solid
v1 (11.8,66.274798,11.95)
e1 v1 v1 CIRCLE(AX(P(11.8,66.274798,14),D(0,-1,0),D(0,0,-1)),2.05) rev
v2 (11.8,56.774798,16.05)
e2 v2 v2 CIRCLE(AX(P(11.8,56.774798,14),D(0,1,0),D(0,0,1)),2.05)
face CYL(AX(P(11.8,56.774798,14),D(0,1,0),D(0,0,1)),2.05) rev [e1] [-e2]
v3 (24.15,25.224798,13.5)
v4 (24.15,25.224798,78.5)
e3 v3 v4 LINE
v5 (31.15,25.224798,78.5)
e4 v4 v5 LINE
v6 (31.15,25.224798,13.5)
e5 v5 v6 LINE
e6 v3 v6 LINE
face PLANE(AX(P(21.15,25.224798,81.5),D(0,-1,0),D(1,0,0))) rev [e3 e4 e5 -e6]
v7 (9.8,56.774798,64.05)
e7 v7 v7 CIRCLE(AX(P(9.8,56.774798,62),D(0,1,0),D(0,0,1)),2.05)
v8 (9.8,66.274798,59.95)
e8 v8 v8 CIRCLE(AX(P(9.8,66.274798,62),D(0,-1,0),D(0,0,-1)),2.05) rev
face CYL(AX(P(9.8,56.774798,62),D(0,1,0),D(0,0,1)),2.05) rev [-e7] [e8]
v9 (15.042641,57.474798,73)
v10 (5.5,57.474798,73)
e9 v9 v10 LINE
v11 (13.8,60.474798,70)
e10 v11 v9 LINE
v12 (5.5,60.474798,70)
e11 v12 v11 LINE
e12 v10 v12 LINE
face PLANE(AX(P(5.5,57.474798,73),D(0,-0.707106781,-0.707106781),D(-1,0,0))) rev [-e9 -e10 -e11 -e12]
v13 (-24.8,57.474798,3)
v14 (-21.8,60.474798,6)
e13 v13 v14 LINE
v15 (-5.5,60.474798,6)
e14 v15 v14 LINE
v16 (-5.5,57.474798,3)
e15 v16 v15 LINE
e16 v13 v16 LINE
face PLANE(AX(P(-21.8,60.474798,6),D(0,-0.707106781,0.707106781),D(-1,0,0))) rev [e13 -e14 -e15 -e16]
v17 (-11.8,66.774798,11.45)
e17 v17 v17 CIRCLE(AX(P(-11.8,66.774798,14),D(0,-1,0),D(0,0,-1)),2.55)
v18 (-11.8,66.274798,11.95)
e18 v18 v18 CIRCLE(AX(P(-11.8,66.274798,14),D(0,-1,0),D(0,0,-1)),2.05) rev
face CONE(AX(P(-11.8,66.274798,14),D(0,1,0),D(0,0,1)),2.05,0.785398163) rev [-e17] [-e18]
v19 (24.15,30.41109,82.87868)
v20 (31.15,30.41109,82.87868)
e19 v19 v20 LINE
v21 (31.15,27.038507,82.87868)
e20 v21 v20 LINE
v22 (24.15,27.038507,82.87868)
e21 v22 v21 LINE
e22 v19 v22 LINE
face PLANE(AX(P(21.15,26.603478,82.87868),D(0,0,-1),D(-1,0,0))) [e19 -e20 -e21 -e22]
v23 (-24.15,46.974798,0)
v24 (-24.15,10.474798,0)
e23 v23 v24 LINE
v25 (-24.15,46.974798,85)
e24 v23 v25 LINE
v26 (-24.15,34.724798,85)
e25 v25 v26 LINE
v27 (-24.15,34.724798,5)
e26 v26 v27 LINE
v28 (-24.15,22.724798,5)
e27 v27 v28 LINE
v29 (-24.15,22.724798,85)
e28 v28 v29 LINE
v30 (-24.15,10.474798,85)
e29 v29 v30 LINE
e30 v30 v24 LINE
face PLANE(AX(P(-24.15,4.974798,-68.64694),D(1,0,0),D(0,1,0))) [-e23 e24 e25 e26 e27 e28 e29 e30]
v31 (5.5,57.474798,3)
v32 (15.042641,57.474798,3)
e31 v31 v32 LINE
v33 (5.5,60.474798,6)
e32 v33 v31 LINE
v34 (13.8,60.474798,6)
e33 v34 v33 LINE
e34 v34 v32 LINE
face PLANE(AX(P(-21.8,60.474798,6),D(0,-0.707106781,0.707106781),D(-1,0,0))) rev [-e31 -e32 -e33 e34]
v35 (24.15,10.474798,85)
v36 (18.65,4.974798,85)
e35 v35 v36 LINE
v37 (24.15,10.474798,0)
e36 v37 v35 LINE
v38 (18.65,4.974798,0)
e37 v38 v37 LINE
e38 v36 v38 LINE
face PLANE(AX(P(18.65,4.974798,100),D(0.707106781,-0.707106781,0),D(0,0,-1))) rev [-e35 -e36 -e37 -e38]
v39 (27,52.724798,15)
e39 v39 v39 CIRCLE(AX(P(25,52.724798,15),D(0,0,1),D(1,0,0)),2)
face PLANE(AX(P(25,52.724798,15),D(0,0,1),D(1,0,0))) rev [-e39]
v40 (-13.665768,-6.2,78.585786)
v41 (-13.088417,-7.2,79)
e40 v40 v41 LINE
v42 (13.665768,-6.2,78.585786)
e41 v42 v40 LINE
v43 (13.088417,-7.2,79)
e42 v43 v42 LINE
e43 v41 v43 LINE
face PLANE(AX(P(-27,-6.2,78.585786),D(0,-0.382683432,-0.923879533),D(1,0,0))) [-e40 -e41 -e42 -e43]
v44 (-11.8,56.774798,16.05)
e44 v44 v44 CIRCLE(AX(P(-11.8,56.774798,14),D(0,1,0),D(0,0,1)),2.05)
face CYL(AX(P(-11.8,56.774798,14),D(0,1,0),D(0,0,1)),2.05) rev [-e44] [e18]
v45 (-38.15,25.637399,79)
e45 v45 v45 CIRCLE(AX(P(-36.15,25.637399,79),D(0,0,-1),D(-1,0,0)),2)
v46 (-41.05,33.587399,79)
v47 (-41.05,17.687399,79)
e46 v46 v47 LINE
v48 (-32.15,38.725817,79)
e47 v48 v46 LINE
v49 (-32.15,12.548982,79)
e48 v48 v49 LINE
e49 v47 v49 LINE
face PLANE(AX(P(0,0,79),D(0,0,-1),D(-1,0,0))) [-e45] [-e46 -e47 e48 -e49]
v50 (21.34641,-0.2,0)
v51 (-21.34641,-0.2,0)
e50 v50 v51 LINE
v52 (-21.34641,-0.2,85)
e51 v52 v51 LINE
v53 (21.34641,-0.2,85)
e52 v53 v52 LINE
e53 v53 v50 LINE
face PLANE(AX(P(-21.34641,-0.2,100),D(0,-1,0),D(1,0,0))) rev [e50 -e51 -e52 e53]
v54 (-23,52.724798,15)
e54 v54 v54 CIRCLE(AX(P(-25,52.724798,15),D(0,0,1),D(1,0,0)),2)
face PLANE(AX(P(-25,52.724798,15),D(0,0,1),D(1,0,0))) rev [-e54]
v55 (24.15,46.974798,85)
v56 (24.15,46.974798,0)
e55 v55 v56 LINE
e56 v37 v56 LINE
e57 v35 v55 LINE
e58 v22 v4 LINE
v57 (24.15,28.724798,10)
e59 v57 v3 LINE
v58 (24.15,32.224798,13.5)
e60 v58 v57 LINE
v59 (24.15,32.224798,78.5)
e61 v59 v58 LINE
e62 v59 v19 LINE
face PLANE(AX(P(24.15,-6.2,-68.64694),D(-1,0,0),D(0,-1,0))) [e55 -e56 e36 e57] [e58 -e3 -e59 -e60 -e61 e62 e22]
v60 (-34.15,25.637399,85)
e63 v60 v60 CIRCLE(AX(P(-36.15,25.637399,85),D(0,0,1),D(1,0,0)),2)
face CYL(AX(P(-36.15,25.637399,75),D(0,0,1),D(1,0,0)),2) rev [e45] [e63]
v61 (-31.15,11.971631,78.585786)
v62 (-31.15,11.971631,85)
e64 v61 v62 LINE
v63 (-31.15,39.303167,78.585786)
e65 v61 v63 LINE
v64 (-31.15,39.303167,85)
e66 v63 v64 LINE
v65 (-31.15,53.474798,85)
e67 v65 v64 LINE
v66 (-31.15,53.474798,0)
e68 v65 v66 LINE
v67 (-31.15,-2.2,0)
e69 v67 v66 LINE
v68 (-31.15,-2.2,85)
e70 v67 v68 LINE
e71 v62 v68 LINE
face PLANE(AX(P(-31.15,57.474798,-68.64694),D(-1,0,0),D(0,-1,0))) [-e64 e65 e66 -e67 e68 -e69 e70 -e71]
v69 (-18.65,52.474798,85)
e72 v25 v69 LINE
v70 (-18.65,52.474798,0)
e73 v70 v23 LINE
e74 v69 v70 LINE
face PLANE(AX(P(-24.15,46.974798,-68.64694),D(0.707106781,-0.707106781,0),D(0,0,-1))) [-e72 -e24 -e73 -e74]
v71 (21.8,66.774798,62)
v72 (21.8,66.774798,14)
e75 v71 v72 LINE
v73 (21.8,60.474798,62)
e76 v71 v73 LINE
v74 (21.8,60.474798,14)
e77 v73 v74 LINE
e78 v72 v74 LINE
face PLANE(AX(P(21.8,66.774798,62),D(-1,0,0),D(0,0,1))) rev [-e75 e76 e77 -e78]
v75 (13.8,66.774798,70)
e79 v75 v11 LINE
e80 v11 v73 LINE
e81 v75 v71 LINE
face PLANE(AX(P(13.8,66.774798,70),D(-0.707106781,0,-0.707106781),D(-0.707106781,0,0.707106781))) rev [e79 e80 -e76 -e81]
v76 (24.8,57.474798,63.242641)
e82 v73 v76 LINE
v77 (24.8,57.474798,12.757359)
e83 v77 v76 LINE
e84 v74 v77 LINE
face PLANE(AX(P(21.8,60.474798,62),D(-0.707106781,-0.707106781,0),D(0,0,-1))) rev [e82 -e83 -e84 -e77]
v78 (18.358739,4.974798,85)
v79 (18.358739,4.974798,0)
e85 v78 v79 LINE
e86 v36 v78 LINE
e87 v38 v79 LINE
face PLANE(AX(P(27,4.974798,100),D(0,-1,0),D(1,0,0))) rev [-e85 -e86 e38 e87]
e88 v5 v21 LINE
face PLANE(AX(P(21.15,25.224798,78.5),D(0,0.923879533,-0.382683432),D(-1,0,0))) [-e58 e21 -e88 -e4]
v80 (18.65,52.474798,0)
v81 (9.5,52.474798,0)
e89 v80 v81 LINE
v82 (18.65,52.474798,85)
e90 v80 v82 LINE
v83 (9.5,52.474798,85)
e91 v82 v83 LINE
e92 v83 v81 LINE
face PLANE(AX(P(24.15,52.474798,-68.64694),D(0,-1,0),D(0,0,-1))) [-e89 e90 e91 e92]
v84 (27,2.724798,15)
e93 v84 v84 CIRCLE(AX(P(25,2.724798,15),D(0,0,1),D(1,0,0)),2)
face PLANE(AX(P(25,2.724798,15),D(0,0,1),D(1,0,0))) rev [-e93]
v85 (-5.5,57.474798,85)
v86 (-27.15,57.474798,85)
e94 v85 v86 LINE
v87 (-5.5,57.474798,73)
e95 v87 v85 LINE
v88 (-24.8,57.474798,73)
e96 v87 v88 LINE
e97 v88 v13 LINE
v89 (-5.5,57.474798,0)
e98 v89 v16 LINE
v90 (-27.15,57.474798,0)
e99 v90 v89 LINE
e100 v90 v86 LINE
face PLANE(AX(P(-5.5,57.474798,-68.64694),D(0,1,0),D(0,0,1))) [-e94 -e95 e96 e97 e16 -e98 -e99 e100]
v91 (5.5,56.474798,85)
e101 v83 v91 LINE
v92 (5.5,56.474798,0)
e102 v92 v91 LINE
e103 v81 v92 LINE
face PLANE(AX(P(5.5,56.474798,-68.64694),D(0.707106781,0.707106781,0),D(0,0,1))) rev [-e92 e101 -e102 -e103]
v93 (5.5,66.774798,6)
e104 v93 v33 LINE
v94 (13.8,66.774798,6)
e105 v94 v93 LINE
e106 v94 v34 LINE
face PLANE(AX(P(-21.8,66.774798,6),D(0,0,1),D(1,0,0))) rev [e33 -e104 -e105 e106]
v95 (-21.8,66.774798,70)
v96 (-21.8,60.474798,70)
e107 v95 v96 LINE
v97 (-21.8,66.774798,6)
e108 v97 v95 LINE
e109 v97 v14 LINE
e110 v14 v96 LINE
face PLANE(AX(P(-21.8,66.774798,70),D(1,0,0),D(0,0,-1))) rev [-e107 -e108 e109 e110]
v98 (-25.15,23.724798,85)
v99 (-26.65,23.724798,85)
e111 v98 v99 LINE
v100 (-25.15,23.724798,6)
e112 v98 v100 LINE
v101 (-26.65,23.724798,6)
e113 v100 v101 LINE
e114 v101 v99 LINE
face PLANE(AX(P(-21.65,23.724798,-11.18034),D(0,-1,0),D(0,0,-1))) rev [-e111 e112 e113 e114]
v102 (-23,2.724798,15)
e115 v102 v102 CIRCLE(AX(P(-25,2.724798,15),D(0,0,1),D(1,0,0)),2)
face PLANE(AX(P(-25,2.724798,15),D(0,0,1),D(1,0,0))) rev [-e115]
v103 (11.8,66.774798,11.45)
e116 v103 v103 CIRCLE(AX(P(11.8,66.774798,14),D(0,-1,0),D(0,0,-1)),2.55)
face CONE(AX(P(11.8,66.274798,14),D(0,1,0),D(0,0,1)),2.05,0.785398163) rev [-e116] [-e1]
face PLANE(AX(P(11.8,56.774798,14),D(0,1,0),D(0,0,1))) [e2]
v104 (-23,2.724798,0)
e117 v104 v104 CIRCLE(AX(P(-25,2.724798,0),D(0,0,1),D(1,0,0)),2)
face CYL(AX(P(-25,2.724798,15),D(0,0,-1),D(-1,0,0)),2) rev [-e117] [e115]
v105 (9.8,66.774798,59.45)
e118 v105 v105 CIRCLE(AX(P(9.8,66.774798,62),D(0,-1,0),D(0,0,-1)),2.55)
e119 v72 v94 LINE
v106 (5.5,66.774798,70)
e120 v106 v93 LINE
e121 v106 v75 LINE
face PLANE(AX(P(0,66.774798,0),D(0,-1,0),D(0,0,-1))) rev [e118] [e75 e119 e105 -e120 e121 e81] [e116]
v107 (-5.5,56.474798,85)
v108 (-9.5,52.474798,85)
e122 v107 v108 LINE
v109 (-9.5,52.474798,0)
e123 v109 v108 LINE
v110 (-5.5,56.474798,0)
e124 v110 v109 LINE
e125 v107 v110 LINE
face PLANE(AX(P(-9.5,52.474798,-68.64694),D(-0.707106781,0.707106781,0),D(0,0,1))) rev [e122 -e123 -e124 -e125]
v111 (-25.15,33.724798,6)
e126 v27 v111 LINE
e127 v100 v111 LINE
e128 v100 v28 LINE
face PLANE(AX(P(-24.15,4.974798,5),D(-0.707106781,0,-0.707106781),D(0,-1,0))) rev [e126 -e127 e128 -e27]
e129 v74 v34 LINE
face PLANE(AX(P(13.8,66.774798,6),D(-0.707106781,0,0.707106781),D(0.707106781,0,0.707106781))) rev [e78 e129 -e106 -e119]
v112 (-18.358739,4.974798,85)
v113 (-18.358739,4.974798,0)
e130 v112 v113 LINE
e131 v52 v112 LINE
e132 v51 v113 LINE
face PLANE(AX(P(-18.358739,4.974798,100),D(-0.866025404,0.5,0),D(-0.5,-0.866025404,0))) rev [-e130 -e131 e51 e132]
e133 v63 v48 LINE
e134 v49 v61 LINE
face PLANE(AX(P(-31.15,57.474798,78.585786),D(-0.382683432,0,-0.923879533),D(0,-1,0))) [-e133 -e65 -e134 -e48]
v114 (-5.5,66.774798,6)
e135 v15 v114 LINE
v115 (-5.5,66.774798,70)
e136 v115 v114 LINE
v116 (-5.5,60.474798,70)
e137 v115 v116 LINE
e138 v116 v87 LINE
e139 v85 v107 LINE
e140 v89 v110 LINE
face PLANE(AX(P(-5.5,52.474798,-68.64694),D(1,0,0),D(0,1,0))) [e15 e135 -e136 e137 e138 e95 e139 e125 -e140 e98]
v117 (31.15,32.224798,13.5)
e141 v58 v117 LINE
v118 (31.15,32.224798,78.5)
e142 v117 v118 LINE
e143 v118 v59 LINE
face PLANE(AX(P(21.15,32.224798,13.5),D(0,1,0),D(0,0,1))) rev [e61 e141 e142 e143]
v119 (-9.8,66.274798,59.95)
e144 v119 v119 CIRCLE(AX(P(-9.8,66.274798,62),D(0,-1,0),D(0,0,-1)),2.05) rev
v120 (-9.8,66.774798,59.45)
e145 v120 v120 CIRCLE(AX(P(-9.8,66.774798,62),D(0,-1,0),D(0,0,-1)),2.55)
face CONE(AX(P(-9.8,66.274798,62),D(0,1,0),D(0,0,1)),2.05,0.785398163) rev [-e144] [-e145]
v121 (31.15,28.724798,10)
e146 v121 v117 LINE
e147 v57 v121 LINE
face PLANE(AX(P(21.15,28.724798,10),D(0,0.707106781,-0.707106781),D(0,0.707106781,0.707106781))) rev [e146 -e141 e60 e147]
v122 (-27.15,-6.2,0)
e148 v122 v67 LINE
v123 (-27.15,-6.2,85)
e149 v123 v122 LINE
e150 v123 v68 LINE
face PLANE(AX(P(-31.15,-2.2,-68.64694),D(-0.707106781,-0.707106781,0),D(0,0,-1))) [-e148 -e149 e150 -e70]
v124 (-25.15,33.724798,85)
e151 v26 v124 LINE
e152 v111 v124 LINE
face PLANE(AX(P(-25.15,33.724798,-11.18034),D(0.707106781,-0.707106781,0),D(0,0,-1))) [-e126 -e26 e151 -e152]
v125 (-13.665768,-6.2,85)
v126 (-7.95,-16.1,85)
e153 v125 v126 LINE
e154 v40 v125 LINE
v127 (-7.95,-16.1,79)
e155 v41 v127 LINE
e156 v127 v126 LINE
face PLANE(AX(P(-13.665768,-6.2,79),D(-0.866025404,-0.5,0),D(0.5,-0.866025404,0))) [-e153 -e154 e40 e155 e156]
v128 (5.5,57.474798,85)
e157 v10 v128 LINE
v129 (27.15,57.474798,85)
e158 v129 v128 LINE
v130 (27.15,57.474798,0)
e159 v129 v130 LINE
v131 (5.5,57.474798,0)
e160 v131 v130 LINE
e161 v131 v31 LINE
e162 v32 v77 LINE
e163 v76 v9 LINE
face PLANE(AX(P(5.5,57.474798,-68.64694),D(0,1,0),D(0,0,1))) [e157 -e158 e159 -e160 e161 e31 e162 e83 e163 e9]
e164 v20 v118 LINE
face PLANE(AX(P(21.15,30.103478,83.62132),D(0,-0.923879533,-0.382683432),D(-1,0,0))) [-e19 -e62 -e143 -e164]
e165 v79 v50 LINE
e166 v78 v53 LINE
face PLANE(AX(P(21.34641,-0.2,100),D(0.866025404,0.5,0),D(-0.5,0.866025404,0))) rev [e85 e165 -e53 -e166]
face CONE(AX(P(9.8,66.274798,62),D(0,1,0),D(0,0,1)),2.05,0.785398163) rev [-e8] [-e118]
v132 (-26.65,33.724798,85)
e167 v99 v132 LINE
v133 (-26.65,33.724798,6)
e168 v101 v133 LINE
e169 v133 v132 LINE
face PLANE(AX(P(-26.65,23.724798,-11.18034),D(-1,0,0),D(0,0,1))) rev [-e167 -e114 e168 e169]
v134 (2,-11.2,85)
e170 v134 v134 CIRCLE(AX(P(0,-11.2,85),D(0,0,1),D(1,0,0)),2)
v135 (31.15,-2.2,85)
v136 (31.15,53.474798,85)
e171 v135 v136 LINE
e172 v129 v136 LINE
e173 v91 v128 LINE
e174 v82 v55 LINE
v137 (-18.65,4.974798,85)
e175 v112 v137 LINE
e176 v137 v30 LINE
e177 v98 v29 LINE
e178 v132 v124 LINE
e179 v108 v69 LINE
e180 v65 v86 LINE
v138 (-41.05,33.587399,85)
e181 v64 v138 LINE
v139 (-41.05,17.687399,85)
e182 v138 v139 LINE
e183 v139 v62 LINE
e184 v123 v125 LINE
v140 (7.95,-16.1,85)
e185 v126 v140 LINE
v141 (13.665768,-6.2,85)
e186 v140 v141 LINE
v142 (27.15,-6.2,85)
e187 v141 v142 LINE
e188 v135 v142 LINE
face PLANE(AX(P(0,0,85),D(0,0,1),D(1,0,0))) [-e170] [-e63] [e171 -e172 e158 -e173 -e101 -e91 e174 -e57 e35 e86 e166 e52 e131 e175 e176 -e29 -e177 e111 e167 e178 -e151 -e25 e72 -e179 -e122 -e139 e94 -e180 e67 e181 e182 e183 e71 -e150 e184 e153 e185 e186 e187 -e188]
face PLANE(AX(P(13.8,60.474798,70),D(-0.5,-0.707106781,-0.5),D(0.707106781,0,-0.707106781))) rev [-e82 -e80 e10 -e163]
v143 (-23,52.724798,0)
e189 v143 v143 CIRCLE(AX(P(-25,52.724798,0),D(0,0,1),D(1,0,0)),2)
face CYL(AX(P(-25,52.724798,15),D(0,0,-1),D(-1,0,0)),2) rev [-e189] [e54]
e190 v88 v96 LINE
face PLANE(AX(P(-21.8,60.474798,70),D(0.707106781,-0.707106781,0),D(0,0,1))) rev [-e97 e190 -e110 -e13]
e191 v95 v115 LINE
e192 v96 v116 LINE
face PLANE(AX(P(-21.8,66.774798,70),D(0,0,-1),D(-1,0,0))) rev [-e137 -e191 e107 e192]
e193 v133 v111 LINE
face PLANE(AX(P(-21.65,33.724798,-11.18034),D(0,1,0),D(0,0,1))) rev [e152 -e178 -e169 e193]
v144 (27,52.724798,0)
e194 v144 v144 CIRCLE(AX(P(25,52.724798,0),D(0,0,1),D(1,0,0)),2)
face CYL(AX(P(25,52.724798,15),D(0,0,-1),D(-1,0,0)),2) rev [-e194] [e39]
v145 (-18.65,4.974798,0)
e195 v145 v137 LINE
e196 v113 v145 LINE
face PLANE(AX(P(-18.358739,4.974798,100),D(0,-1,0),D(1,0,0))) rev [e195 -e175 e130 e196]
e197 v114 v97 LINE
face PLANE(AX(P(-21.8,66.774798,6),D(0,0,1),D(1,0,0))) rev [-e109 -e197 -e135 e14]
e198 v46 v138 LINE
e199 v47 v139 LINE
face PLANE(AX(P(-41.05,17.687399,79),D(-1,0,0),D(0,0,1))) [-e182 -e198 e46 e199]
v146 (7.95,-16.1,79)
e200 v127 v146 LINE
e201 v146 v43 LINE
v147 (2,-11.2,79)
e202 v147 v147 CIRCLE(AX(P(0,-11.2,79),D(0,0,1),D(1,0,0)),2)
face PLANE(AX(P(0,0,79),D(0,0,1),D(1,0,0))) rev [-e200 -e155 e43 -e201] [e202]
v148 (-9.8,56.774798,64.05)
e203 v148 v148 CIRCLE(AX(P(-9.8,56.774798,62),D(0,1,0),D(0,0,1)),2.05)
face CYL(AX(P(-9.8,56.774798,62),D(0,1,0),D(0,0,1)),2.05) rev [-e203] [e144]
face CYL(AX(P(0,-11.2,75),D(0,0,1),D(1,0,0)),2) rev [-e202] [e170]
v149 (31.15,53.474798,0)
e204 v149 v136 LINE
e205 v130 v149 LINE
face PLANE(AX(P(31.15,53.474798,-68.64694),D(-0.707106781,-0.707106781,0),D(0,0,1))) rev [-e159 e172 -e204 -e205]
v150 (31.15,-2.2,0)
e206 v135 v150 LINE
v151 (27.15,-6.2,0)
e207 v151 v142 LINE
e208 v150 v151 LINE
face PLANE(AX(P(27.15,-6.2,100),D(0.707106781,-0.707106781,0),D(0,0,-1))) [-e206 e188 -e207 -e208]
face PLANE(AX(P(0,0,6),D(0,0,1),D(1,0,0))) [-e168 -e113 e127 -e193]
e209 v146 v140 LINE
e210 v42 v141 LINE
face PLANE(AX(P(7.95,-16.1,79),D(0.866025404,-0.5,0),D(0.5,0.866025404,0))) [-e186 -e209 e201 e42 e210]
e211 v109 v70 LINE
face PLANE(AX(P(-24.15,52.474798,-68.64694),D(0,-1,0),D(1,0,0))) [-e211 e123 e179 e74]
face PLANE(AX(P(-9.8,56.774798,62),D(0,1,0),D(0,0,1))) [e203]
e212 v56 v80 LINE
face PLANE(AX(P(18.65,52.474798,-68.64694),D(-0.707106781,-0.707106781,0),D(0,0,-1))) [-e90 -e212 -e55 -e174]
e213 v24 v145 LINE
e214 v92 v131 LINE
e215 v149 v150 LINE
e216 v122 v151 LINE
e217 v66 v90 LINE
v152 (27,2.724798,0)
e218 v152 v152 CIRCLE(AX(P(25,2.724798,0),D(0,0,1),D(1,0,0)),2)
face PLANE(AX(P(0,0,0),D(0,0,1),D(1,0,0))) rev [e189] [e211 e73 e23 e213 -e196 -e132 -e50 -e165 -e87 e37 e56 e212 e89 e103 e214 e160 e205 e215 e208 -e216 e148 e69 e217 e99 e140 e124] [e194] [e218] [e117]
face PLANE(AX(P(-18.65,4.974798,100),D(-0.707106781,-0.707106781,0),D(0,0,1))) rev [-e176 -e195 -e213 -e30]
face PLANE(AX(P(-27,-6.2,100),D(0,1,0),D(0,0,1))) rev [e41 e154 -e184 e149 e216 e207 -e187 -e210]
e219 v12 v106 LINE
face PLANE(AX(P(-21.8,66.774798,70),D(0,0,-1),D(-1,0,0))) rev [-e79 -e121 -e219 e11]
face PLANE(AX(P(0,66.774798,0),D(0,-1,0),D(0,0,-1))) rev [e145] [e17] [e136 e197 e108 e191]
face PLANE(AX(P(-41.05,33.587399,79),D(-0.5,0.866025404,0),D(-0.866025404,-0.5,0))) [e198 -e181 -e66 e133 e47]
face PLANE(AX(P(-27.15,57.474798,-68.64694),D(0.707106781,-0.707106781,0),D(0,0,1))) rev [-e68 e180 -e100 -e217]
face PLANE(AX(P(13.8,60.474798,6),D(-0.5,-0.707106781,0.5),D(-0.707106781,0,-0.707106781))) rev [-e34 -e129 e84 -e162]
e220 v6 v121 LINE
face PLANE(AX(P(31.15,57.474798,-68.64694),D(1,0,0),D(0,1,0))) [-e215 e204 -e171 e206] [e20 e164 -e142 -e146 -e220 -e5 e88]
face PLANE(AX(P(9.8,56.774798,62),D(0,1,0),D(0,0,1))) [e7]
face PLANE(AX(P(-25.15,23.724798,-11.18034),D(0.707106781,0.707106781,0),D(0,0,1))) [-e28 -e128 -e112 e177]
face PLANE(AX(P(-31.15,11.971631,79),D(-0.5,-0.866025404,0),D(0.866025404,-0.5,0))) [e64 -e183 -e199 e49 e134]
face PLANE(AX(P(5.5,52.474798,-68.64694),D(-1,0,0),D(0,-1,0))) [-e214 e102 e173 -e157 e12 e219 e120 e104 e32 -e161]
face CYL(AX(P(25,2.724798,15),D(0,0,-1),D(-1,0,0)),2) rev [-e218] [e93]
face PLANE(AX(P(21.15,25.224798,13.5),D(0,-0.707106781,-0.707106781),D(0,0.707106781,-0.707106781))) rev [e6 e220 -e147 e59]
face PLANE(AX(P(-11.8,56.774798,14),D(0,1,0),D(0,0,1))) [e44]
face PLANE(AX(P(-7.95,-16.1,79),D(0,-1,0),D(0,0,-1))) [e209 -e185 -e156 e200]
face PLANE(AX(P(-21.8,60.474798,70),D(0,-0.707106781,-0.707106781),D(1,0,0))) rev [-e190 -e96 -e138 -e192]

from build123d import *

# Parameters (mm, degrees)
BOSS_EXTRUDE1_DEPTH     = 100
BOSS_EXTRUDE2_DEPTH     = 100
CUT_EXTRUDE1_DEPTH      = 10
CHAMFER1_SIZE           = 5.5
CHAMFER2_SIZE           = 4
SKETCH8_R               = 2
BOSS_EXTRUDE3_DEPTH     = 9.3
CUT_EXTRUDE3_DEPTH      = 125.214315536
CUT_EXTRUDE3_DEPTH_BACK = 10
SKETCH9_W               = 11
SKETCH9_H               = 9.3
CHAMFER3_SIZE           = 4
CHAMFER4_SIZE           = 3
CHAMFER5_SIZE           = 3
SKETCH10_W              = 5
SKETCH10_H              = 10
CUT_EXTRUDE4_DEPTH      = 94
CHAMFER7_SIZE           = 1
CHAMFER8_SIZE           = 1
SKETCH11_R              = 2.05
CUT_EXTRUDE5_DEPTH      = 10
CHAMFER9_SIZE           = 0.5
SKETCH12_R              = 2
CUT_EXTRUDE6_DEPTH      = 15
SKETCH20_W              = 62.3
SKETCH20_H              = 63.674798271
CUT_EXTRUDE14_DEPTH     = 15
BOSS_EXTRUDE4_DEPTH     = 6
SKETCH22_R              = 2
CUT_EXTRUDE15_DEPTH     = 10
CHAMFER10_SIZE          = 1
CHAMFER10_SIZE2         = 0.414213562
CHAMFER11_SIZE          = 1
CHAMFER11_SIZE2         = 0.414213562


with BuildPart() as part:
    # Sketch4 → Boss-Extrude1 (new body)
    with BuildSketch(Plane.XY):
        Polygon((-18.358738987, 4.974798271), (-27, 4.974798271), (-27, -6.2), (27, -6.2), (27, 4.974798271), (18.358738987, 4.974798271), (21.346410162, -0.2), (-21.346410162, -0.2), align=None)
    extrude(amount=BOSS_EXTRUDE1_DEPTH)

    # Sketch6 → Boss-Extrude2 (add)
    with BuildSketch(Plane.XY.offset(100)):
        Polygon((-24.15, 4.974798271), (-24.15, 52.474798271), (-5.5, 52.474798271), (-5.5, 57.474798271), (-31.15, 57.474798271), (-31.15, -6.2), (-24.15, -6.2), align=None)
        Polygon((24.15, -6.2), (24.15, 52.474798271), (5.5, 52.474798271), (5.5, 57.474798271), (31.15, 57.474798271), (31.15, -6.2), align=None)
    extrude(amount=-BOSS_EXTRUDE2_DEPTH)

    # Sketch7 → Cut-Extrude1 (cut)
    with BuildSketch(Plane(origin=(31.15, 0, 0), x_dir=(0, 0, -1), z_dir=(1, 0, 0))):
        Polygon((-85, 28.724798271), (-81.5, 25.224798271), (-13.5, 25.224798271), (-10, 28.724798271), (-13.5, 32.224798271), (-81.5, 32.224798271), align=None)
    extrude(amount=-CUT_EXTRUDE1_DEPTH, mode=Mode.SUBTRACT)

    # Chamfer1
    chamfer1_edges = [part.edges().sort_by_distance(p)[0] for p in [
        (-24.15, 52.474798271, 50),
        (-24.15, 4.974798271, 50),
        (24.15, 4.974798271, 50),
        (24.15, 52.474798271, 50),
    ]]
    chamfer(chamfer1_edges, length=CHAMFER1_SIZE)

    # Chamfer2
    chamfer2_edges = [part.edges().sort_by_distance(p)[0] for p in [
        (-5.5, 52.474798271, 50),
        (5.5, 52.474798271, 50),
    ]]
    chamfer(chamfer2_edges, length=CHAMFER2_SIZE)

    # Sketch8 → Boss-Extrude3 (add)
    with BuildSketch(Plane(origin=(0, 57.474798271, 0), x_dir=(1, 0, 0), z_dir=(0, 1, 0))):
        Polygon((-21.8, -70), (13.8, -70), (21.8, -62), (21.8, -14), (13.8, -6), (-21.8, -6), align=None)
        with Locations(Location((9.8, -62, 0), (0, 0, 270))):
            Circle(SKETCH8_R, mode=Mode.SUBTRACT)
        with Locations(Location((11.8, -14, 0), (0, 0, 270))):
            Circle(SKETCH8_R, mode=Mode.SUBTRACT)
        with Locations(Location((-11.8, -14, 0), (0, 0, 270))):
            Circle(SKETCH8_R, mode=Mode.SUBTRACT)
        with Locations(Location((-9.8, -62, 0), (0, 0, 270))):
            Circle(SKETCH8_R, mode=Mode.SUBTRACT)
    extrude(amount=BOSS_EXTRUDE3_DEPTH)

    # Sketch9 → Cut-Extrude3 (cut, two sides: drawn at the far end of the back side and taken through both)
    with BuildSketch(Plane.XY.offset(-CUT_EXTRUDE3_DEPTH_BACK)):
        with Locations((0, 62.124798271)):
            Rectangle(SKETCH9_W, SKETCH9_H)
    extrude(amount=CUT_EXTRUDE3_DEPTH + CUT_EXTRUDE3_DEPTH_BACK, mode=Mode.SUBTRACT)

    # Chamfer3
    chamfer3_edges = [part.edges().sort_by_distance(p)[0] for p in [
        (-31.15, -6.2, 50),
        (-31.15, 57.474798271, 50),
        (31.15, -6.2, 50),
        (31.15, 57.474798271, 50),
    ]]
    chamfer(chamfer3_edges, length=CHAMFER3_SIZE)

    # Chamfer4
    chamfer4_edges = [part.edges().sort_by_distance(p)[0] for p in [
        (9.65, 57.474798271, 70),
        (-21.8, 57.474798271, 38),
        (-13.65, 57.474798271, 70),
        (17.8, 57.474798271, 66),
        (21.8, 57.474798271, 38),
        (17.8, 57.474798271, 10),
        (9.65, 57.474798271, 6),
        (-13.65, 57.474798271, 6),
    ]]
    chamfer(chamfer4_edges, length=CHAMFER4_SIZE)

    # Chamfer5
    # the kernel refuses this chamfer: 3 mm, written as the material it adds along each edge
    with BuildSketch(Plane(origin=(31.15, 25.224798271, 81.5), x_dir=(0, -0.014760203742521738, -0.9998910622590239), z_dir=(-1, 0, 0)), Plane(origin=(31.15, 32.224798271, 81.5), x_dir=(0, -0.6965927104131427, 0.7174667907292097), z_dir=(-1, 0, 0))) as chamfer5_piece_1:
        Polygon((CHAMFER5_SIZE * 0.999891062259, -CHAMFER5_SIZE * 0.0147602037425), (-CHAMFER5_SIZE * 0.717466790729, -CHAMFER5_SIZE * 0.696592710413), (0, 0), align=None)
    extrude(amount=7)
    with BuildSketch(Plane(origin=(31.15, 28.724798271, 85), x_dir=(0, 0.7262819568766863, -0.687396915264661), z_dir=(-1, 0, 0))) as chamfer5_piece_2:
        Polygon((CHAMFER5_SIZE * 0.999621916911, CHAMFER5_SIZE * 0.0274958766106), (-CHAMFER5_SIZE * 0.0274958766106, CHAMFER5_SIZE * 0.999621916911), (0, 0), align=None)
    extrude(amount=7)

    # Sketch10 → Cut-Extrude4 (cut)
    with BuildSketch(Plane.XY.offset(100)):
        with Locations((-24.15, 28.724798271)):
            Rectangle(SKETCH10_W, SKETCH10_H)
    extrude(amount=-CUT_EXTRUDE4_DEPTH, mode=Mode.SUBTRACT)

    # Chamfer7
    chamfer7_edges = [part.edges().sort_by_distance(p)[0] for p in [
        (-24.15, 28.724798271, 6),
    ]]
    chamfer(chamfer7_edges, length=CHAMFER7_SIZE)

    # Chamfer8
    chamfer8_edges = [part.edges().sort_by_distance(p)[0] for p in [
        (-24.15, 23.724798271, 52.5),
        (-24.15, 33.724798271, 52.5),
    ]]
    chamfer(chamfer8_edges, length=CHAMFER8_SIZE)

    # Sketch11 → Cut-Extrude5 (cut)
    with BuildSketch(Plane(origin=(0, 66.774798271, 0), x_dir=(1, 0, 0), z_dir=(0, 1, 0))):
        with Locations(Location((-11.8, -14, 0), (0, 0, 270))):
            Circle(SKETCH11_R)
        with Locations(Location((11.8, -14, 0), (0, 0, 270))):
            Circle(SKETCH11_R)
        with Locations(Location((-9.8, -62, 0), (0, 0, 270))):
            Circle(SKETCH11_R)
        with Locations(Location((9.8, -62, 0), (0, 0, 270))):
            Circle(SKETCH11_R)
    extrude(amount=-CUT_EXTRUDE5_DEPTH, mode=Mode.SUBTRACT)

    # Chamfer9
    chamfer9_edges = [part.edges().sort_by_distance(p)[0] for p in [
        (11.8, 66.774798271, 11.95),
        (-9.8, 66.774798271, 59.95),
        (9.8, 66.774798271, 59.95),
        (-11.8, 66.774798271, 11.95),
    ]]
    chamfer(chamfer9_edges, length=CHAMFER9_SIZE)

    # Sketch12 → Cut-Extrude6 (cut)
    with BuildSketch(Plane.XY):
        with Locations((-25, 52.724798271)):
            Circle(SKETCH12_R)
        with Locations((25, 52.724798271)):
            Circle(SKETCH12_R)
        with Locations((-25, 2.724798271)):
            Circle(SKETCH12_R)
        with Locations((25, 2.724798271)):
            Circle(SKETCH12_R)
    extrude(amount=CUT_EXTRUDE6_DEPTH, mode=Mode.SUBTRACT)

    # Sketch20 → Cut-Extrude14 (cut)
    with BuildSketch(Plane.XY.offset(100)):
        with Locations((0, 25.637399136)):
            Rectangle(SKETCH20_W, SKETCH20_H)
    extrude(amount=-CUT_EXTRUDE14_DEPTH, mode=Mode.SUBTRACT)

    # Sketch21 → Boss-Extrude4 (add)
    with BuildSketch(Plane.XY.offset(85)):
        Polygon((-31.15, 11.971631471), (-41.05, 17.687399136), (-41.05, 33.587399136), (-31.15, 39.303166801), align=None)
        Polygon((-13.665767665, -6.2), (-7.95, -16.1), (7.95, -16.1), (13.665767665, -6.2), align=None)
    extrude(amount=-BOSS_EXTRUDE4_DEPTH)

    # Sketch22 → Cut-Extrude15 (cut)
    with BuildSketch(Plane.XY.offset(85)):
        with Locations((-36.15, 25.637399136)):
            Circle(SKETCH22_R)
        with Locations((0, -11.2)):
            Circle(SKETCH22_R)
    extrude(amount=-CUT_EXTRUDE15_DEPTH, mode=Mode.SUBTRACT)

    # Chamfer10
    chamfer10_edges = [part.edges().sort_by_distance(p)[0] for p in [
        (0, -6.2, 79),
    ]]
    chamfer10_side = [part.faces().sort_by_distance(p)[0] for p in [
        (-10.556136515, -11.004653619, 79),
    ]]
    chamfer(chamfer10_edges, length=CHAMFER10_SIZE, length2=CHAMFER10_SIZE2, reference=chamfer10_side[0])

    # Chamfer11
    chamfer11_edges = [part.edges().sort_by_distance(p)[0] for p in [
        (-31.15, 25.637399136, 79),
    ]]
    chamfer11_side = [part.faces().sort_by_distance(p)[0] for p in [
        (-35.954653619, 15.08126262, 79),
    ]]
    chamfer(chamfer11_edges, length=CHAMFER11_SIZE, length2=CHAMFER11_SIZE2, reference=chamfer11_side[0])


solid = part.part
